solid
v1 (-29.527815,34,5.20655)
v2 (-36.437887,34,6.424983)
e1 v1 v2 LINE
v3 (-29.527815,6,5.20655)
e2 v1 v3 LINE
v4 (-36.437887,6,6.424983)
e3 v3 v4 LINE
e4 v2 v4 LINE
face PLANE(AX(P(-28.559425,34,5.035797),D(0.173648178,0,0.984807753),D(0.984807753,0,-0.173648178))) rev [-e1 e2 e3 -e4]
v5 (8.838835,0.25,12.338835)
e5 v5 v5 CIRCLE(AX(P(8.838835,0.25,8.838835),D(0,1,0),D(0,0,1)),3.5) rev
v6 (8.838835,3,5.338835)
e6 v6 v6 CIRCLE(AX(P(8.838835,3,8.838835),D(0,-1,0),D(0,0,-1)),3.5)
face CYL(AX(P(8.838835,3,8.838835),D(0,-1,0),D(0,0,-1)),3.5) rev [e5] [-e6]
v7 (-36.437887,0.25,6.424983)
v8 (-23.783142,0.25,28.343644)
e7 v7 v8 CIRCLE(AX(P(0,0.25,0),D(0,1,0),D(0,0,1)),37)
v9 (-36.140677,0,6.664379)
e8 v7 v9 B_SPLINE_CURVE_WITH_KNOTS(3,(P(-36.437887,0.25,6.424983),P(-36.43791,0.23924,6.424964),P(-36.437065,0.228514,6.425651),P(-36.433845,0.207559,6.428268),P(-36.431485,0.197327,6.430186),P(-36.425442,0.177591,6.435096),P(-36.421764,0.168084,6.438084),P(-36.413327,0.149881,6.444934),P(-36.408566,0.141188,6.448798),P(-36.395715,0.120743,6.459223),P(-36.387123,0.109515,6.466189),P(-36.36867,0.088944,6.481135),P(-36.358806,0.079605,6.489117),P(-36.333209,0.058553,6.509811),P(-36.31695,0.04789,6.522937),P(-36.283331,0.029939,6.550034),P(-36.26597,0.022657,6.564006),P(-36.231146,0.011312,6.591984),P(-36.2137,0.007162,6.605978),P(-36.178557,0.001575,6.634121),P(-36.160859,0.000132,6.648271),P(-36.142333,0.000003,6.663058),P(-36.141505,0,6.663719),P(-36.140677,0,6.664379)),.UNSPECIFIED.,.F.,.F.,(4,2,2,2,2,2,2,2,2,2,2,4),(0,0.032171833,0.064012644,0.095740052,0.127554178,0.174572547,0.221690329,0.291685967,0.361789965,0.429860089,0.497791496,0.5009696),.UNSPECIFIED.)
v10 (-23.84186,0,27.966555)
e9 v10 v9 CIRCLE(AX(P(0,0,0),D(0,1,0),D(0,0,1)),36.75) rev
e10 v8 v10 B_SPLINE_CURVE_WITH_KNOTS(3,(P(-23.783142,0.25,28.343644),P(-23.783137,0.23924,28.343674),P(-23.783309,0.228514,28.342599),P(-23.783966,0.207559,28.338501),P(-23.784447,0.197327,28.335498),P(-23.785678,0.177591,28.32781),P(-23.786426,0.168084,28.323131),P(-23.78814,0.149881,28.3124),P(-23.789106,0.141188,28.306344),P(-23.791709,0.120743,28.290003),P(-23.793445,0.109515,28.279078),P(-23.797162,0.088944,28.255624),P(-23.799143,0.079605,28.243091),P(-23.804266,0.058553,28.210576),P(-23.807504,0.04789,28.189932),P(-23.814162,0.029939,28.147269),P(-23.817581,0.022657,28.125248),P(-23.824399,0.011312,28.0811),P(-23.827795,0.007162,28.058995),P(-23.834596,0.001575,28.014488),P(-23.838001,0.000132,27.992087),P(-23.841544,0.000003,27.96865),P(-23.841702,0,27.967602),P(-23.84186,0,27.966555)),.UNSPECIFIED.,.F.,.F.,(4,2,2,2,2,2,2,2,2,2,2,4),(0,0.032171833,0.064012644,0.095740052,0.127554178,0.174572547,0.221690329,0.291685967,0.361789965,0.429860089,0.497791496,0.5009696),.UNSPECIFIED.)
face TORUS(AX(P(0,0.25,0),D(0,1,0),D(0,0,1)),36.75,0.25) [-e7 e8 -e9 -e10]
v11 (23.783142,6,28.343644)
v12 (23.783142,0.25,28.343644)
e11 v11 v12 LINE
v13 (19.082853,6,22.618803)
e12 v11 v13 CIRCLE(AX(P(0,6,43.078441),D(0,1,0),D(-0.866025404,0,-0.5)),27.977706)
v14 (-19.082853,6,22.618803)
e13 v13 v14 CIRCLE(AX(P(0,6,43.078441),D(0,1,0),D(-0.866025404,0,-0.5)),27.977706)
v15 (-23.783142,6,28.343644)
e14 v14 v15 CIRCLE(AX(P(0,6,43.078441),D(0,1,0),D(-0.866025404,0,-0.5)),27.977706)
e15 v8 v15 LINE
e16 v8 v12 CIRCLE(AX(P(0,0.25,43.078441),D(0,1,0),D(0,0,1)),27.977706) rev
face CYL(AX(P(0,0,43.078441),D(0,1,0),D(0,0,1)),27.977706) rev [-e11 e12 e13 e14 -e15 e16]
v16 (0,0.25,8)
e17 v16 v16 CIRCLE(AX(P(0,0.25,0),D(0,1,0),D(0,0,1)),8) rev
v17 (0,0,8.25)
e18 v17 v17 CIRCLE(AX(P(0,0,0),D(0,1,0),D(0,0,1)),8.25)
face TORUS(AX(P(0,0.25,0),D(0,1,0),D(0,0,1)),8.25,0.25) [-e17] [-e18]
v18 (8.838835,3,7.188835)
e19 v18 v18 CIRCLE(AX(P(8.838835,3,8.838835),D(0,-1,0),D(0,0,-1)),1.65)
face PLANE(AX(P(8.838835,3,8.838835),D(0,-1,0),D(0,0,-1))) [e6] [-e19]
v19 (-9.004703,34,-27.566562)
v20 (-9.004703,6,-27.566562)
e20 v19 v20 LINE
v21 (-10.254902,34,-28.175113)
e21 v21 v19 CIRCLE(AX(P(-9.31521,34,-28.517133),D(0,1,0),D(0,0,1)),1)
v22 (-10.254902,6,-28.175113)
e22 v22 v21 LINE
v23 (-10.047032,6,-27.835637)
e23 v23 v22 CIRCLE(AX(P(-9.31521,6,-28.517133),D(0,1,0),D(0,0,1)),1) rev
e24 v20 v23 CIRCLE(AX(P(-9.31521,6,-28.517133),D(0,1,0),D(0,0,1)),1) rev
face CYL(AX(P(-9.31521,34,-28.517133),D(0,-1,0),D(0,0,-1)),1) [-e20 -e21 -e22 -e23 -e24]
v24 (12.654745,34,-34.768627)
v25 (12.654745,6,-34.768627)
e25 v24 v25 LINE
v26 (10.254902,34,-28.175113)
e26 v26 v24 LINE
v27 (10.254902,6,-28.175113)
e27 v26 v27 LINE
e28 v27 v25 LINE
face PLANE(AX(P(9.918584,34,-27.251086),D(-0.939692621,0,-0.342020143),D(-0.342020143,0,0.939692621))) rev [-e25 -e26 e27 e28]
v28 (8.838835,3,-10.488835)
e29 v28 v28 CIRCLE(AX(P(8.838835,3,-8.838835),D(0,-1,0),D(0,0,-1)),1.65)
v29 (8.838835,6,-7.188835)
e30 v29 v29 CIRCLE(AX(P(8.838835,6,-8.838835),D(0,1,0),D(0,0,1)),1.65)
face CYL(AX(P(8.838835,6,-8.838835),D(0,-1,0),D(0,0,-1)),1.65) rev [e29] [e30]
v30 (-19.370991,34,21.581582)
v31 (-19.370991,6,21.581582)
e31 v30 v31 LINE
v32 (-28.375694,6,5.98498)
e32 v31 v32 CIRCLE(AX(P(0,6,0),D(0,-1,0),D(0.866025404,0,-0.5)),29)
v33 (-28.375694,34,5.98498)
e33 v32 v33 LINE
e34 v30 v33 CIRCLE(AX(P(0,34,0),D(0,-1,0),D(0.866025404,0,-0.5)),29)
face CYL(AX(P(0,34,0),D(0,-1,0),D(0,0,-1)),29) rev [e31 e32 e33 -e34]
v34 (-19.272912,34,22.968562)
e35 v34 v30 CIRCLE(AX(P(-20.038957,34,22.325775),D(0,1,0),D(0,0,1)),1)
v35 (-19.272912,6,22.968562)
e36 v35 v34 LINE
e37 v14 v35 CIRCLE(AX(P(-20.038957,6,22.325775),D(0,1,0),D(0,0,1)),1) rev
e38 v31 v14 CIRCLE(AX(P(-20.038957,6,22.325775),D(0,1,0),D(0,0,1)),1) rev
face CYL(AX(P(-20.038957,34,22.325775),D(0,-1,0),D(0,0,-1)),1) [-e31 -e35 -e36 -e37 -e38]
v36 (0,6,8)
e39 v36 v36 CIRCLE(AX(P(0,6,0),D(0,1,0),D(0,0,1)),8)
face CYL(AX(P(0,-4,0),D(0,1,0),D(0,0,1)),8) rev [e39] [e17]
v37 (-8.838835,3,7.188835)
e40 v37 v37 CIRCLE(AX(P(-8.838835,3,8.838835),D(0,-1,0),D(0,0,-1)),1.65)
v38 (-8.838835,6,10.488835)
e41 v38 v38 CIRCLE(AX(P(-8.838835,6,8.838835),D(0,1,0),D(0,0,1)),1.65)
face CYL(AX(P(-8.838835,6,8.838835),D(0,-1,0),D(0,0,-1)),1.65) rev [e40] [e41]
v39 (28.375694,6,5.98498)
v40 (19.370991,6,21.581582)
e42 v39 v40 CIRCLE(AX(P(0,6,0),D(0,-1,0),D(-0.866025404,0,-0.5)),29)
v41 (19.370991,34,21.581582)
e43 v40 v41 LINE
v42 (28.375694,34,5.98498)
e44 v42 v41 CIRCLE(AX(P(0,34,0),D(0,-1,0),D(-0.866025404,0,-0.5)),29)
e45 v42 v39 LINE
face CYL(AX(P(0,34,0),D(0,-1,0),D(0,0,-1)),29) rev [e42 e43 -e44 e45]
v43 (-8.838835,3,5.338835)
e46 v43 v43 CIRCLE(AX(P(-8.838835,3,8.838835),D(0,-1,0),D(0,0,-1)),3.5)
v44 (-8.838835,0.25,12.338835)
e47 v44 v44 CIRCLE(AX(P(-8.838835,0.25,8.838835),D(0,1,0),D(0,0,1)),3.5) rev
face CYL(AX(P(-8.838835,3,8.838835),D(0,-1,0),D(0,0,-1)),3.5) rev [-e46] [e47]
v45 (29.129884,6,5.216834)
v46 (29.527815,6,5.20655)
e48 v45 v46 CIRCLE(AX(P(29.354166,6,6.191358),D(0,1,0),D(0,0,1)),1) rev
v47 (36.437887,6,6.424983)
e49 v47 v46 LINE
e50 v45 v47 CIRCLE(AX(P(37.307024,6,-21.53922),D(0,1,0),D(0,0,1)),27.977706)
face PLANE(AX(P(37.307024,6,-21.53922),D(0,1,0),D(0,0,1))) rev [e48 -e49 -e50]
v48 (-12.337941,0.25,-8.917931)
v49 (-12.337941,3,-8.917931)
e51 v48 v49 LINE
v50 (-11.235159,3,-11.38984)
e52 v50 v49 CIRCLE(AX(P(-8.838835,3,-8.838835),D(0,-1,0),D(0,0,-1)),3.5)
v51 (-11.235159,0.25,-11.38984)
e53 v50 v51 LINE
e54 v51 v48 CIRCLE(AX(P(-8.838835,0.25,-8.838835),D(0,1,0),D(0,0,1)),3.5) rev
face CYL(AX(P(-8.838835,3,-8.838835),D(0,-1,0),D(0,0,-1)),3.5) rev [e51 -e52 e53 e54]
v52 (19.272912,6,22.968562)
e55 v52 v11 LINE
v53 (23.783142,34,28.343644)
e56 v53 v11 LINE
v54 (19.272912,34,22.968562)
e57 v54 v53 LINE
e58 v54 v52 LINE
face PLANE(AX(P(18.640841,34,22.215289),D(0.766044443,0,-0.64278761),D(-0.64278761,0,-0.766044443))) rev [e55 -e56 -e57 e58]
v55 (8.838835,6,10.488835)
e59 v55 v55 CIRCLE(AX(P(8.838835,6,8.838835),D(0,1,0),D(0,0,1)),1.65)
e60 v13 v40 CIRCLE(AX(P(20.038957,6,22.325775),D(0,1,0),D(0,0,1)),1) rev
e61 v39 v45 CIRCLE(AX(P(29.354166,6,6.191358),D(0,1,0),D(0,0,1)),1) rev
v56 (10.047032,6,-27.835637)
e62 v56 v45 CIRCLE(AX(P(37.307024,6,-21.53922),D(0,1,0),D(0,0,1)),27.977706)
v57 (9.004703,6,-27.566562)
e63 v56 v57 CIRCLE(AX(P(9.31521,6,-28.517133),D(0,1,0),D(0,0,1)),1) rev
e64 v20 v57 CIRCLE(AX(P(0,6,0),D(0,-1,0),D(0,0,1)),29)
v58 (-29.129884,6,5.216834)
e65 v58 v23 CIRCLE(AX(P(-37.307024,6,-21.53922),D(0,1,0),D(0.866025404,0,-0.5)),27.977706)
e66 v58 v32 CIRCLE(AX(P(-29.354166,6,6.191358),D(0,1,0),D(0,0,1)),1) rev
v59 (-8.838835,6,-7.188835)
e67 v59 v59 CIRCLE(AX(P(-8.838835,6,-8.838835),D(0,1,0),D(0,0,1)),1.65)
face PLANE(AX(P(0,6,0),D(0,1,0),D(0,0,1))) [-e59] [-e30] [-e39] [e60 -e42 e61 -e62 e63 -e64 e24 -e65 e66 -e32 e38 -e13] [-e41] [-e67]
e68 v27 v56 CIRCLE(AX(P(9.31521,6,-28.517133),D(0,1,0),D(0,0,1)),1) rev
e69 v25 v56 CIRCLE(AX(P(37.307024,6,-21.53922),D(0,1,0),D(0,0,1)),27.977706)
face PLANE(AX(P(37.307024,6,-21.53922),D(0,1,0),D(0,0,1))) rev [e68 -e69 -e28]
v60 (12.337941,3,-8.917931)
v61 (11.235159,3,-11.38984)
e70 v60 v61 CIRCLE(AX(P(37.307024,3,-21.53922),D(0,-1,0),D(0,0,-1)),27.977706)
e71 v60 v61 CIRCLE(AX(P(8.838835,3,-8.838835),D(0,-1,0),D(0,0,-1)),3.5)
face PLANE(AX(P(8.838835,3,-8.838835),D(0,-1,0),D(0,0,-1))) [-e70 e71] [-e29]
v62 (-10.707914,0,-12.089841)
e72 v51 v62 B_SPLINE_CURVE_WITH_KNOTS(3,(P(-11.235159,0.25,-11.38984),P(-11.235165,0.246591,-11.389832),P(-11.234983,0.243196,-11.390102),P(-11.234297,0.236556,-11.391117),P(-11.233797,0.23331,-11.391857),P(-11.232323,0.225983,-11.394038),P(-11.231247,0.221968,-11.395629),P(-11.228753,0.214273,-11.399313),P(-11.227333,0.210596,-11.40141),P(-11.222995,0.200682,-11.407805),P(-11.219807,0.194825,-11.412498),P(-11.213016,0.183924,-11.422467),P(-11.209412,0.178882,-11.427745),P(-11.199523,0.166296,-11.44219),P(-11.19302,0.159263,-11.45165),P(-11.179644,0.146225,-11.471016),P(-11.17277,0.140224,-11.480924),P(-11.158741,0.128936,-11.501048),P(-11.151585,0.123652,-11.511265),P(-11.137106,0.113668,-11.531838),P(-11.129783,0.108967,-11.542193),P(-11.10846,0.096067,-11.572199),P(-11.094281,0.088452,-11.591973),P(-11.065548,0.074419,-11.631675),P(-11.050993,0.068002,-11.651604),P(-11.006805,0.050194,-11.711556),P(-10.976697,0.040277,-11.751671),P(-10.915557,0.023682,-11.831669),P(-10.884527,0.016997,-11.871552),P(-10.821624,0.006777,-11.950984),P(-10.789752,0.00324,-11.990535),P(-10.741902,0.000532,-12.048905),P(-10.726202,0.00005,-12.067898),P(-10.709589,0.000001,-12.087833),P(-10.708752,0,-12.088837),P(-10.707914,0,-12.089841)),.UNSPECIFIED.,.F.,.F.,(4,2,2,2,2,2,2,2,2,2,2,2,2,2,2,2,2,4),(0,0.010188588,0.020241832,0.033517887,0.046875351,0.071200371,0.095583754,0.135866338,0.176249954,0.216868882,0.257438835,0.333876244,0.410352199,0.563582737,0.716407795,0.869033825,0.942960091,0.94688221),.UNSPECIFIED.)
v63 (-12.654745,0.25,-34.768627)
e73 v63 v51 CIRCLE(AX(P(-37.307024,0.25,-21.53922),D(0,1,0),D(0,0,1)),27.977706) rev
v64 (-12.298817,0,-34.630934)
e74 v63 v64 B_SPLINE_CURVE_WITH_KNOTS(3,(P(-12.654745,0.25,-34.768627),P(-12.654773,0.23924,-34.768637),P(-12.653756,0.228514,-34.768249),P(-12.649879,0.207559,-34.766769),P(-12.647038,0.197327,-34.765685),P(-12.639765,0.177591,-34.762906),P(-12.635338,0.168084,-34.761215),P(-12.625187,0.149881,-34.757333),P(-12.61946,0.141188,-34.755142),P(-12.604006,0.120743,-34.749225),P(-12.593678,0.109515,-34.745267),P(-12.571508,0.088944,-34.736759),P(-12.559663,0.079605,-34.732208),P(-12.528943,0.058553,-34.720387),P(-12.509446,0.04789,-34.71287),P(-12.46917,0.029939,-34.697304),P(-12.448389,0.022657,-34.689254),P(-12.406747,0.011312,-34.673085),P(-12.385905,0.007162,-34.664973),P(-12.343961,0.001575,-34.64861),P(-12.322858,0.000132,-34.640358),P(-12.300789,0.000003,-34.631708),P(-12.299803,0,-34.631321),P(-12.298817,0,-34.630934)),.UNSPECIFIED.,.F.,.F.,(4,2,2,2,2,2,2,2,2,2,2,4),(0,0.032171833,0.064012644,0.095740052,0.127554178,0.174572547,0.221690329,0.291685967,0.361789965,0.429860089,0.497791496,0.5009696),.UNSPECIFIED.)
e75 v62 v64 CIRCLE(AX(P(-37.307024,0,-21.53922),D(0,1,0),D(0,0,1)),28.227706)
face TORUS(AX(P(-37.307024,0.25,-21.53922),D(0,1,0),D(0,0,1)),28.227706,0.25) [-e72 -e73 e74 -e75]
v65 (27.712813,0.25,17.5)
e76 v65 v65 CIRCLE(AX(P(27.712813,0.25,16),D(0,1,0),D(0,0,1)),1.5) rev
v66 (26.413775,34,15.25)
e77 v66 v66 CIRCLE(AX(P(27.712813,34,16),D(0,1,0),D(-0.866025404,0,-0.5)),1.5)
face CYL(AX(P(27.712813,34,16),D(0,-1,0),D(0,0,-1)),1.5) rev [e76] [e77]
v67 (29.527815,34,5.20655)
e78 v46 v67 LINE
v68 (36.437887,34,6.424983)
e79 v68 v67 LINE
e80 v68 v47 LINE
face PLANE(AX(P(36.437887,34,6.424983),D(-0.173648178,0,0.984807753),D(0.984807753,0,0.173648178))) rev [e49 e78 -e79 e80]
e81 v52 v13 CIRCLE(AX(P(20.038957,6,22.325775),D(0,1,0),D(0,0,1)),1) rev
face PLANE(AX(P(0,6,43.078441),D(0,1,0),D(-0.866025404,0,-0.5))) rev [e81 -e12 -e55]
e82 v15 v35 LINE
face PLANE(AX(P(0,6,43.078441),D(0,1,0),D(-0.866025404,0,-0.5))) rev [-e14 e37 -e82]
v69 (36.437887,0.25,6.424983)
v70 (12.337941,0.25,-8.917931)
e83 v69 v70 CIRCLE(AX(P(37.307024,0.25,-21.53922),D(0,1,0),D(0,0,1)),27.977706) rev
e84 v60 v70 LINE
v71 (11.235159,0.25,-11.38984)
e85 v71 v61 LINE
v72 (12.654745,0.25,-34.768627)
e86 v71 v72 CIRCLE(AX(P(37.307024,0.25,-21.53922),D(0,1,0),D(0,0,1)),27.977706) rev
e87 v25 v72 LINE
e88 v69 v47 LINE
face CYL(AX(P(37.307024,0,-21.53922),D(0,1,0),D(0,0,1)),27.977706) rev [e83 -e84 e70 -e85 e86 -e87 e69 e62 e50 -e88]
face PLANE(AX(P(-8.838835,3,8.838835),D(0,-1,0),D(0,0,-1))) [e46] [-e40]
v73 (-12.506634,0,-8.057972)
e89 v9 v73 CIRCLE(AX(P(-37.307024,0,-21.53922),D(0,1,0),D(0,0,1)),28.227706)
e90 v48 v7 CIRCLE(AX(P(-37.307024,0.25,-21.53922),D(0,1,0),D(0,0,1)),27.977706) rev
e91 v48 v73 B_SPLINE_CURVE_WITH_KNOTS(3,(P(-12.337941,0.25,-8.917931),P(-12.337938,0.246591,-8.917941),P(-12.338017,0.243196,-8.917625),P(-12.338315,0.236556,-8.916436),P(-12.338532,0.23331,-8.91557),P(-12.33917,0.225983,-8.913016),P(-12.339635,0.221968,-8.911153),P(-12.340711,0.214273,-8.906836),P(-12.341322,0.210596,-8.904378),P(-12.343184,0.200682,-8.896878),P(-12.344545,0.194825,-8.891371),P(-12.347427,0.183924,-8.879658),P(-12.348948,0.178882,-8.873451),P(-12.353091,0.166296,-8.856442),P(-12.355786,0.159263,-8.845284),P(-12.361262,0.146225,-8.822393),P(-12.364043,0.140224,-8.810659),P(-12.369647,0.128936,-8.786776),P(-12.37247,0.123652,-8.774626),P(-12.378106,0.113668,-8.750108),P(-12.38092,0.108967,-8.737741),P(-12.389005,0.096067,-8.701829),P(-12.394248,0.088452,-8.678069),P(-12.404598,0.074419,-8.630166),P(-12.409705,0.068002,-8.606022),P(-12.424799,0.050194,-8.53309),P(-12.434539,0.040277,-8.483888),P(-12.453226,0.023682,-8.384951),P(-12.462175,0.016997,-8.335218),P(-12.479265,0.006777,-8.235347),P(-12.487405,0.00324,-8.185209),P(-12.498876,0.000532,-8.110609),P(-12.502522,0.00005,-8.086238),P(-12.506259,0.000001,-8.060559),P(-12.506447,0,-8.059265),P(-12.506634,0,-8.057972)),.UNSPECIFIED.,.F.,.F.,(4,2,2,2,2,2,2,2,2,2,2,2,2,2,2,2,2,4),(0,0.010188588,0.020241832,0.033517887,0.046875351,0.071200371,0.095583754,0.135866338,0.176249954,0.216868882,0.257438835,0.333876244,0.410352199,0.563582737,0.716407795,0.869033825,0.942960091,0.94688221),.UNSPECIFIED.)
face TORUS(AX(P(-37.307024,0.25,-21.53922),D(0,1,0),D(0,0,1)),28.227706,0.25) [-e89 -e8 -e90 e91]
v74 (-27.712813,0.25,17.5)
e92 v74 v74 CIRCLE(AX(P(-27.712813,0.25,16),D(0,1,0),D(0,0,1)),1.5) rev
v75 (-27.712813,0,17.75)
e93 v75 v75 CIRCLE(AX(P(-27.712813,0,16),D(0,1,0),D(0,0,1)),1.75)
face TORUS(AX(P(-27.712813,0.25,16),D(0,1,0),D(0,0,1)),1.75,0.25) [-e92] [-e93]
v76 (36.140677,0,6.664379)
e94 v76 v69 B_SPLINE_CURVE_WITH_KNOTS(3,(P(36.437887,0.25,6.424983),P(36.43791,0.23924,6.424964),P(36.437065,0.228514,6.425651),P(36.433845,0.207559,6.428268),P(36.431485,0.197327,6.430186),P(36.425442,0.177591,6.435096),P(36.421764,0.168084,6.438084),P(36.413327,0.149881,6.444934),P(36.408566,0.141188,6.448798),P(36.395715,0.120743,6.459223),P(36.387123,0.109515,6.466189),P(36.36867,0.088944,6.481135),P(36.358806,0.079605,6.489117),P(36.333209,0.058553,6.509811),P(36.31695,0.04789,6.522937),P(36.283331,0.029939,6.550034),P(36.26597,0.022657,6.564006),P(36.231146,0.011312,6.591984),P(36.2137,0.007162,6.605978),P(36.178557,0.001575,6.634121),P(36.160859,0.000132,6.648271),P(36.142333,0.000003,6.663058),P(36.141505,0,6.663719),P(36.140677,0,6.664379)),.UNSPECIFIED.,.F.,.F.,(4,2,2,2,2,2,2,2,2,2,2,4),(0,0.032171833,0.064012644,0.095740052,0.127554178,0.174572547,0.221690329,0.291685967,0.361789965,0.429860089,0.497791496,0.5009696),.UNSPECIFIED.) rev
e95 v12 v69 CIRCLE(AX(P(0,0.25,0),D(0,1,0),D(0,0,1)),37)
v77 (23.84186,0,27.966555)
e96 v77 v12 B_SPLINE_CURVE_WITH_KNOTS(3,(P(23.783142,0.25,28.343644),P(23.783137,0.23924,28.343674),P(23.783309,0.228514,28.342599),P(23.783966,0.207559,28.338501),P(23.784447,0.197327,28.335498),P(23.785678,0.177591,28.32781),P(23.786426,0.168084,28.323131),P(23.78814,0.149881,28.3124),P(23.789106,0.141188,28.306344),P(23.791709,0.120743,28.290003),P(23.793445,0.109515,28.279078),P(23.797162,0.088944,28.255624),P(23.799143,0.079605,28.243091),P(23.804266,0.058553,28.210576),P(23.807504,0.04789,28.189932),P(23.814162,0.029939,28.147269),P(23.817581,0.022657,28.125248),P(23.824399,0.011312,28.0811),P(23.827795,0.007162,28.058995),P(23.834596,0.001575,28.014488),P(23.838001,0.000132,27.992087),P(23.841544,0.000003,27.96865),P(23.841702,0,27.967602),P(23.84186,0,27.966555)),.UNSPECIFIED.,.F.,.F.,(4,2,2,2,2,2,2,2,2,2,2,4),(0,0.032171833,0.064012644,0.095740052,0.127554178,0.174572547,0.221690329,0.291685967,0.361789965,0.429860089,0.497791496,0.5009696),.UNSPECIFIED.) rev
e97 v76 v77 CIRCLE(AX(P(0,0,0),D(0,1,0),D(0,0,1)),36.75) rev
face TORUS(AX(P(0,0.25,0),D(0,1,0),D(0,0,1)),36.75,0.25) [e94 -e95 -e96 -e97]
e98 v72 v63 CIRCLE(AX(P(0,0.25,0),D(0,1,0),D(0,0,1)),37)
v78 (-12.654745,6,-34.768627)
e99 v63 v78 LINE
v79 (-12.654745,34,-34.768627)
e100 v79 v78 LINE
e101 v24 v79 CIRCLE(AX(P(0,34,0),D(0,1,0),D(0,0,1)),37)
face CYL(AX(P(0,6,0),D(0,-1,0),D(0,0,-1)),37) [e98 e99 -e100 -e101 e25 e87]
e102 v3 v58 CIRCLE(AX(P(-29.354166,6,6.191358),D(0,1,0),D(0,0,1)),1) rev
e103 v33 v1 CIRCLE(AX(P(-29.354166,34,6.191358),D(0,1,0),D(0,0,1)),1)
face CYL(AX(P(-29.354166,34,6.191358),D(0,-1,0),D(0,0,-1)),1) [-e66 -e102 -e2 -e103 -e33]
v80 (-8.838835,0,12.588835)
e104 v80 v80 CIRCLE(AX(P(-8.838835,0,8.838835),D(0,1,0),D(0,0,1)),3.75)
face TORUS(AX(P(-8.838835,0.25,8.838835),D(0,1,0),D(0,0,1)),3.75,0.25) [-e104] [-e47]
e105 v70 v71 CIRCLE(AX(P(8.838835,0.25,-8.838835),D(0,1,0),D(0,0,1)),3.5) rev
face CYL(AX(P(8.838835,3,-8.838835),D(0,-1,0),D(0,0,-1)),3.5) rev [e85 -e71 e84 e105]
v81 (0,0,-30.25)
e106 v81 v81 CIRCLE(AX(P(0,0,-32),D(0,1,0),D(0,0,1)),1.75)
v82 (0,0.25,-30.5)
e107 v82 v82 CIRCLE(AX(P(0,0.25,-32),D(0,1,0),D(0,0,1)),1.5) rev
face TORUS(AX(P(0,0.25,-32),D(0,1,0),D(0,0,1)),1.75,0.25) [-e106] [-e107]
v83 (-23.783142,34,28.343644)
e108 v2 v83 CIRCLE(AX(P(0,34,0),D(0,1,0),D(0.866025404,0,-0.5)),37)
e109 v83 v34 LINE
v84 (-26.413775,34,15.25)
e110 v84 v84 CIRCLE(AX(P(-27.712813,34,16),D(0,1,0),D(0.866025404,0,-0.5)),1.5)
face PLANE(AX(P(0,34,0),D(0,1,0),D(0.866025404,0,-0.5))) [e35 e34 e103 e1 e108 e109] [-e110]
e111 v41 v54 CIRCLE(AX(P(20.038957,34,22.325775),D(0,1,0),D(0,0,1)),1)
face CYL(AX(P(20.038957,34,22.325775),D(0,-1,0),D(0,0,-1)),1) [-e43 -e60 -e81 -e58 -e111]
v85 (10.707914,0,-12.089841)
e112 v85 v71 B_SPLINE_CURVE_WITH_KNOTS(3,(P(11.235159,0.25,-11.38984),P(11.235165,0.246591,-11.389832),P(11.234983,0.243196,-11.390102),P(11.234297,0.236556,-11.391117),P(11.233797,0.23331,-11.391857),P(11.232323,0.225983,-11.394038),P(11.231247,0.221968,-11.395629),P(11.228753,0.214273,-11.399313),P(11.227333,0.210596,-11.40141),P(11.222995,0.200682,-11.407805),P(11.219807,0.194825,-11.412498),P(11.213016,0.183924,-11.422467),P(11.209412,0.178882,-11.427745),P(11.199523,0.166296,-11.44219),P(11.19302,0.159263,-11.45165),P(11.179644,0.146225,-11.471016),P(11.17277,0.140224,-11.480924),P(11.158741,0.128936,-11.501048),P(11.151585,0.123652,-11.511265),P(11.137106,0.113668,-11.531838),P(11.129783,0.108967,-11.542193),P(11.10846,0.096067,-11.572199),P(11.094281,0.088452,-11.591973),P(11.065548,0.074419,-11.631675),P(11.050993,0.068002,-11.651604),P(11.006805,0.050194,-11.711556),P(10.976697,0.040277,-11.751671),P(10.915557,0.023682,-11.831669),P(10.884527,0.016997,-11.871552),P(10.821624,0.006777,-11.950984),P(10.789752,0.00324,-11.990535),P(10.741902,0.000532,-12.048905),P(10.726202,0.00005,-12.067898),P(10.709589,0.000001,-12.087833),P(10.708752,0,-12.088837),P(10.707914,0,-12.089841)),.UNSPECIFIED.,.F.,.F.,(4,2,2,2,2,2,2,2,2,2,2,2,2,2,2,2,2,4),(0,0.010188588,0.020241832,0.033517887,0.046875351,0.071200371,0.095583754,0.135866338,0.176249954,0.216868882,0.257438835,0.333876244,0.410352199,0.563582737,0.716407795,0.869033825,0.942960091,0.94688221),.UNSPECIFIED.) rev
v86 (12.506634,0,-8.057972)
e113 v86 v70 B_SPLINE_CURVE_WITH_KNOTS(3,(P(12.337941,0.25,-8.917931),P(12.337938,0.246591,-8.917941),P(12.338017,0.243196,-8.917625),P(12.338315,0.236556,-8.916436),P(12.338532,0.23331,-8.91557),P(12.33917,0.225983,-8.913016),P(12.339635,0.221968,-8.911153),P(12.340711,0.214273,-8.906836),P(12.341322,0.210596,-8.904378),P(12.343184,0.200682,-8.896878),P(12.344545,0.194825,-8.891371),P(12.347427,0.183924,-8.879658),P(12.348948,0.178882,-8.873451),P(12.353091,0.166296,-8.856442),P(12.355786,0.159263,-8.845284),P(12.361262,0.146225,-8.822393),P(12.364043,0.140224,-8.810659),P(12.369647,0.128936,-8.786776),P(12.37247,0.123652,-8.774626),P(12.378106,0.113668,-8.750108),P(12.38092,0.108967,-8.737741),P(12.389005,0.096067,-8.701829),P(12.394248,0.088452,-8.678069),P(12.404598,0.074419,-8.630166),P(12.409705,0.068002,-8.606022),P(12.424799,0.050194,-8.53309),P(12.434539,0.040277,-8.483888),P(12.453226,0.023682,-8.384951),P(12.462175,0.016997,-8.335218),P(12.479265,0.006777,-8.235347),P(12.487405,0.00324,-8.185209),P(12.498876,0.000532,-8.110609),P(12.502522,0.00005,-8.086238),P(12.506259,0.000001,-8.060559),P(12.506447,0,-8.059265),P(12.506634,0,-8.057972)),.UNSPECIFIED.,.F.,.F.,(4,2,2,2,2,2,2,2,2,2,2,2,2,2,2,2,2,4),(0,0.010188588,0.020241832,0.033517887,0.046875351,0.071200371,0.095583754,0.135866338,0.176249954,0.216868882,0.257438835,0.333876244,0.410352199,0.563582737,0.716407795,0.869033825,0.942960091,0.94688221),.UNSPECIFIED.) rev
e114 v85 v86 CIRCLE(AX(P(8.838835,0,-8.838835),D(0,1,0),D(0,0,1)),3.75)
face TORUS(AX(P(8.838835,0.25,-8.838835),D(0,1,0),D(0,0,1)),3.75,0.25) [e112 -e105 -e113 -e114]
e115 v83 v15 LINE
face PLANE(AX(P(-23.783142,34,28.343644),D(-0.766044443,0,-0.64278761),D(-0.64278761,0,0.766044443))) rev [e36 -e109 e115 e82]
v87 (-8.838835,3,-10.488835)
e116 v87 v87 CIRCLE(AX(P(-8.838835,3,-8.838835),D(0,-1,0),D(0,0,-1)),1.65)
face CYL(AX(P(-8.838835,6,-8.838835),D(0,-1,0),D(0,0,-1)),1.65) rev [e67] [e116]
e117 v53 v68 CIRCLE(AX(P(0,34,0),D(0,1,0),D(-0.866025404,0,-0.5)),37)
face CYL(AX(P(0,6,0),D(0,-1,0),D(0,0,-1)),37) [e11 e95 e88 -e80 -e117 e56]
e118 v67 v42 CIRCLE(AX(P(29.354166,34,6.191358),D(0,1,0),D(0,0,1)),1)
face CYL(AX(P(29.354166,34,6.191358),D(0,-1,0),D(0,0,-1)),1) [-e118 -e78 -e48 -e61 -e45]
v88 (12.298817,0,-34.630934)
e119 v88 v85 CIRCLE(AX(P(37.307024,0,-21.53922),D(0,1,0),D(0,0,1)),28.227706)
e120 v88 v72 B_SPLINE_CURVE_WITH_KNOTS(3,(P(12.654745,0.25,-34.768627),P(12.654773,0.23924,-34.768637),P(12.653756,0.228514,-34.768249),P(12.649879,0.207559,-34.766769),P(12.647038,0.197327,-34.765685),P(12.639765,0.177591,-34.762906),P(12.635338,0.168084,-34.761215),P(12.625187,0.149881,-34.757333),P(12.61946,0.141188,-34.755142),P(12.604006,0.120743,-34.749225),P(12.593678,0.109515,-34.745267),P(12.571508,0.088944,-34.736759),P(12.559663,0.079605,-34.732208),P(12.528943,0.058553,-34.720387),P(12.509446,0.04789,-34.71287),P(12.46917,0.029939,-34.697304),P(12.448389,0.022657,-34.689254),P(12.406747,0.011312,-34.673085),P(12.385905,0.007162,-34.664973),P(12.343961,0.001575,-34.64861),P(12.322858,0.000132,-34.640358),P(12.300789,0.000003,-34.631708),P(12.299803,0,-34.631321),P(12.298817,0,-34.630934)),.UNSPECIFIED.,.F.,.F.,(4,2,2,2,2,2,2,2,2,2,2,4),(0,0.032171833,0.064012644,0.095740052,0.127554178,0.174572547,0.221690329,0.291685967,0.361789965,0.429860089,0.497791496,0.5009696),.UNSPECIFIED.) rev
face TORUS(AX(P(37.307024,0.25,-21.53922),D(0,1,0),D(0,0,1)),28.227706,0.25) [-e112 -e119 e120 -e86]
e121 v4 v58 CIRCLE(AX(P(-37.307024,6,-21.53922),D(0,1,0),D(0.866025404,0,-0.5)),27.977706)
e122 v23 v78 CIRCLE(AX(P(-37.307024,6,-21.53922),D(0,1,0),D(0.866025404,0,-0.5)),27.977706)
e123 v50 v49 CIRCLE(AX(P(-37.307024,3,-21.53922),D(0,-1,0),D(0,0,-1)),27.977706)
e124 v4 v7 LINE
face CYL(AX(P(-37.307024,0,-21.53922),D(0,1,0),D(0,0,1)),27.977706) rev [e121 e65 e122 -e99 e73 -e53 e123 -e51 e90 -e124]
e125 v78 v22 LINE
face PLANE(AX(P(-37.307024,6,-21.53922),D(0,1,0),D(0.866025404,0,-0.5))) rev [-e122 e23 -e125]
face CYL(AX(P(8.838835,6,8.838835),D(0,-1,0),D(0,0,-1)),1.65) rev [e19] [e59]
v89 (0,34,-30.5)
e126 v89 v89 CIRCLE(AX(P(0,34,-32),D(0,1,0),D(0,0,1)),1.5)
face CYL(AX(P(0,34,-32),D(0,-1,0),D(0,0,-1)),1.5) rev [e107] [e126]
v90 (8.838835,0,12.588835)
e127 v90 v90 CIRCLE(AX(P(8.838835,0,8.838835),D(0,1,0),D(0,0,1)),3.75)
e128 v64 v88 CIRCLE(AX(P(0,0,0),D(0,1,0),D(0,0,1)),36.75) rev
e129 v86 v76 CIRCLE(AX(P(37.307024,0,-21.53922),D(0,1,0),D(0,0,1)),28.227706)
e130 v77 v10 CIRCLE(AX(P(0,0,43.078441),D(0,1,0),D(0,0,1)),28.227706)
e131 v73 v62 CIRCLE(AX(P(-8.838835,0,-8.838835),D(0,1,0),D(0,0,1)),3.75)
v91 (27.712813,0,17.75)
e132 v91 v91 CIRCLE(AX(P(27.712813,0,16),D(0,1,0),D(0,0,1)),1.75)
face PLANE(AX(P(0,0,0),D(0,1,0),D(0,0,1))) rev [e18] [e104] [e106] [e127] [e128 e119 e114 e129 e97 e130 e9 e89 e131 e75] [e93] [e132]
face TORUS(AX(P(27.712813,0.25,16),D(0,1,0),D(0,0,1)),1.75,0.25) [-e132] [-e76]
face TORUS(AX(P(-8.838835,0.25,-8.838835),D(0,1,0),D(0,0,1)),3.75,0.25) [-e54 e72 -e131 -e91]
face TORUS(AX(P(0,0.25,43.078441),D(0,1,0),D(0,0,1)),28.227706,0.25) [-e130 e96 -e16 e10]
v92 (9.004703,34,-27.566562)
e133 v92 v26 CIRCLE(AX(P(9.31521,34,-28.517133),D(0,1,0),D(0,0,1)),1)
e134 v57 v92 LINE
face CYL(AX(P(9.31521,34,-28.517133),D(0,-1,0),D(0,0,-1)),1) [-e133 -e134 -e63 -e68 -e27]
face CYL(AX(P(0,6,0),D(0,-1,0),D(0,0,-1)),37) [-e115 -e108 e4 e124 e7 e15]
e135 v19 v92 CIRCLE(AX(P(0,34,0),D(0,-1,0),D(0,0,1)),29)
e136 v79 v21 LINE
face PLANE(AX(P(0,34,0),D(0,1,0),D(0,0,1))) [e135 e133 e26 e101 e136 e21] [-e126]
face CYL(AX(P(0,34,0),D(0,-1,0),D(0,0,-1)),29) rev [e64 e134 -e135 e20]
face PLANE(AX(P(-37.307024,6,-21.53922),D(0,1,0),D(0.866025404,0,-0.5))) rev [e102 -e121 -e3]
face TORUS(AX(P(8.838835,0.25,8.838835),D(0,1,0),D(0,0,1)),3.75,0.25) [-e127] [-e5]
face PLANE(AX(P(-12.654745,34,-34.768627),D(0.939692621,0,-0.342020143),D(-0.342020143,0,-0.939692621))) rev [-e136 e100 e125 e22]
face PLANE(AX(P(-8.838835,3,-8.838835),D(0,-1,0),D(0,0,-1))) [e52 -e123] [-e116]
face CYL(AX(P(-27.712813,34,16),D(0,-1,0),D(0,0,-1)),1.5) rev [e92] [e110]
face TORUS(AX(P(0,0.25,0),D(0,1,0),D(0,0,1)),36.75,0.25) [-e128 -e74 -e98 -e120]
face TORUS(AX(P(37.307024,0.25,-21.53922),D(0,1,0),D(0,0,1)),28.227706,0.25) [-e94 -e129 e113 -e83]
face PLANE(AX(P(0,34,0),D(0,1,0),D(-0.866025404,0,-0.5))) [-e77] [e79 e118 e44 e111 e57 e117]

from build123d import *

# Parameters (mm, degrees)
SKETCH1_R           = 37
SKETCH1_R_2         = 1.65
BOSS_EXTRUDE1_DEPTH = 6
SKETCH2_R           = 1.5
BOSS_EXTRUDE2_DEPTH = 28
SKETCH16_R          = 1.5
CUT_EXTRUDE9_DEPTH  = 63.401923047
CIRPATTERN1_COUNT   = 3
SKETCH3_R           = 8
CUT_EXTRUDE1_DEPTH  = 10
SKETCH4_R           = 3.5
CUT_EXTRUDE2_DEPTH  = 3
SKETCH5_R           = 27.977706125
CUT_EXTRUDE3_DEPTH  = 60.3464405
CIRPATTERN2_COUNT   = 3
FILLET1_R           = 0.25
FILLET2_R           = 1


with BuildPart() as part:
    # Sketch1 → Boss-Extrude1 (new body)
    with BuildSketch(Plane(origin=(0, 0, 0), x_dir=(1, 0, 0), z_dir=(0, 1, 0))):
        with Locations(Location((0, 0, 0), (0, 0, 270))):
            Circle(SKETCH1_R)
        with Locations(Location((-8.838834765, 8.838834765, 0), (0, 0, 270))):
            Circle(SKETCH1_R_2, mode=Mode.SUBTRACT)
        with Locations(Location((8.838834765, 8.838834765, 0), (0, 0, 270))):
            Circle(SKETCH1_R_2, mode=Mode.SUBTRACT)
        with Locations(Location((8.838834765, -8.838834765, 0), (0, 0, 270))):
            Circle(SKETCH1_R_2, mode=Mode.SUBTRACT)
        with Locations(Location((-8.838834765, -8.838834765, 0), (0, 0, 270))):
            Circle(SKETCH1_R_2, mode=Mode.SUBTRACT)
    extrude(amount=BOSS_EXTRUDE1_DEPTH)

    # Sketch2 → Boss-Extrude2 (add)
    with BuildSketch(Plane(origin=(0, 6, 0), x_dir=(1, 0, 0), z_dir=(0, 1, 0))):
        with BuildLine():
            Line((-12.654745303, 34.768626969), (-9.918584156, 27.251086003))
            ThreePointArc((-9.918584156, 27.251086003), (0, 29), (9.918584156, 27.251086003))
            Line((9.918584156, 27.251086003), (12.654745303, 34.768626969))
            ThreePointArc((12.654745303, 34.768626969), (0, 37), (-12.654745303, 34.768626969))
        make_face()
        with Locations(Location((0, 32, 0), (0, 0, 270))):
            Circle(SKETCH2_R, mode=Mode.SUBTRACT)
    boss_extrude2 = extrude(amount=BOSS_EXTRUDE2_DEPTH)

    # Sketch16 → Cut-Extrude9 (cut, through all)
    with BuildSketch(Plane(origin=(0, 34, 0), x_dir=(1, 0, 0), z_dir=(0, 1, 0))):
        with Locations(Location((0, 32, 0), (0, 0, 270))):
            Circle(SKETCH16_R)
    cut_extrude9 = extrude(amount=-CUT_EXTRUDE9_DEPTH, mode=Mode.SUBTRACT)

    # CirPattern1: Boss-Extrude2, Cut-Extrude9 ×3 about axis
    cirpattern1_axis = Axis((0, 0, 0), (0, 1, 0))
    add([boss_extrude2.rotate(cirpattern1_axis, i * 360 / CIRPATTERN1_COUNT) for i in range(1, CIRPATTERN1_COUNT)])
    add([cut_extrude9.rotate(cirpattern1_axis, i * 360 / CIRPATTERN1_COUNT) for i in range(1, CIRPATTERN1_COUNT)], mode=Mode.SUBTRACT)

    # Sketch3 → Cut-Extrude1 (cut)
    with BuildSketch(Plane(origin=(0, 6, 0), x_dir=(1, 0, 0), z_dir=(0, 1, 0))):
        with Locations(Location((0, 0, 0), (0, 0, 270))):
            Circle(SKETCH3_R)
    extrude(amount=-CUT_EXTRUDE1_DEPTH, mode=Mode.SUBTRACT)

    # Sketch4 → Cut-Extrude2 (cut)
    with BuildSketch(Plane.XZ):
        with Locations(Location((8.838834765, 8.838834765, 0), (0, 0, 270))):
            Circle(SKETCH4_R)
        with Locations(Location((8.838834765, -8.838834765, 0), (0, 0, 270))):
            Circle(SKETCH4_R)
        with Locations(Location((-8.838834765, -8.838834765, 0), (0, 0, 270))):
            Circle(SKETCH4_R)
        with Locations(Location((-8.838834765, 8.838834765, 0), (0, 0, 270))):
            Circle(SKETCH4_R)
    extrude(amount=-CUT_EXTRUDE2_DEPTH, mode=Mode.SUBTRACT)

    # Sketch5 → Cut-Extrude3 (cut, through all)
    with BuildSketch(Plane(origin=(0, 6, 0), x_dir=(1, 0, 0), z_dir=(0, 1, 0))):
        with Locations((37.30702387, 21.539220274)):
            Circle(SKETCH5_R)
    cut_extrude3 = extrude(amount=-CUT_EXTRUDE3_DEPTH, mode=Mode.SUBTRACT)

    # CirPattern2: Cut-Extrude3 ×3 about axis
    cirpattern2_axis = Axis((0, 0, 0), (0, 1, 0))
    for i in range(1, CIRPATTERN2_COUNT):
        add(cut_extrude3.rotate(cirpattern2_axis, i * 360 / CIRPATTERN2_COUNT), mode=Mode.SUBTRACT)

    # Fillet1
    fillet1_edges = [part.edges().sort_by_distance(p)[0] for p in [
        (8.838834765, 0, 12.338834765),
        (5.642491698, 0, -7.41286457),
        (0, 0, -37),
        (22.281889782, 0, 2.061571782),
        (9.380753213, 0, -23.234934645),
        (-5.642491698, 0, -7.41286457),
        (-32.04293994, 0, 18.5),
        (32.04293994, 0, 18.5),
        (-9.380753213, 0, -23.234934645),
        (-22.281889782, 0, 2.061571782),
        (0, 0, 15.100734422),
        (0, 0, -33.5),
        (-29.011851027, 0, 16.75),
        (29.011851027, 0, 16.75),
        (0, 0, -8),
        (-8.838834765, 0, 12.338834765),
    ]]
    fillet(fillet1_edges, radius=FILLET1_R)

    # Fillet2
    # the kernel refuses this fillet: 1 mm, written as the material it takes off along each edge
    with BuildSketch(Plane(origin=(-9.918584156, 6, -27.251086003), x_dir=(-0.34202014332566266, 0, -0.9396926207859105), z_dir=(0, 1, 0)), Plane(origin=(-18.640840681, 6, 22.21528885), x_dir=(-0.6427876096865424, 0, 0.7660444431189755), z_dir=(0, 1, 0))) as fillet2_piece_1:
        with BuildLine():
            CenterArc((0.983328701, -1), FILLET2_R, 90, 88.089786828)
            ThreePointArc((-0.016115589, -0.966666667), (-0.004029177, -0.483400496), (0, 0))
            Line((0, 0), (0.983328701, 0))
        make_face()
    extrude(amount=30.458321753, mode=Mode.SUBTRACT)
    with BuildSketch(Plane(origin=(9.918584156, 6, -27.251086003), x_dir=(0.3420201433256693, 0, -0.9396926207859081), z_dir=(0, 1, 0)), Plane(origin=(-28.559424837, 6, 5.035797152), x_dir=(-0.9848077530122081, 0, 0.17364817766692994), z_dir=(0, 1, 0))) as fillet2_piece_2:
        with BuildLine():
            CenterArc((0.983328701, 1), FILLET2_R, 181.910213172, 88.089786828)
            ThreePointArc((-0.016115589, 0.966666667), (-0.004029177, 0.483400496), (0, 0))
            Line((0, 0), (0.983328701, 0))
        make_face()
    extrude(amount=30.458321753, mode=Mode.SUBTRACT)
    with BuildSketch(Plane(origin=(28.559424837, 6, 5.035797152), x_dir=(-0.1900397947920235, 0, 0.9817763881838907), z_dir=(0, 1, 0))) as fillet2_piece_3:
        with BuildLine():
            CenterArc((0.983469974, 0.999861063), FILLET2_R, 180.955106586, 88.089786828)
            Line((-0.016391089, 0.98319208), (0, 0))
            ThreePointArc((0, 0), (0.483400496, 0.004029177), (0.966800991, 0))
        make_face()
    extrude(amount=30.458321753, mode=Mode.SUBTRACT)
    with BuildSketch(Plane(origin=(18.640840681, 6, 22.21528885), x_dir=(0.755223395606972, 0, -0.655467484111817), z_dir=(0, 1, 0))) as fillet2_piece_4:
        with BuildLine():
            CenterArc((0.983469974, -0.999861063), FILLET2_R, 90.955106586, 88.089786828)
            Line((-0.016391089, -0.98319208), (0, 0))
            ThreePointArc((0, 0), (0.483400496, -0.004029177), (0.966800991, 0))
        make_face()
    extrude(amount=30.458321753, mode=Mode.SUBTRACT)


solid = part.part
